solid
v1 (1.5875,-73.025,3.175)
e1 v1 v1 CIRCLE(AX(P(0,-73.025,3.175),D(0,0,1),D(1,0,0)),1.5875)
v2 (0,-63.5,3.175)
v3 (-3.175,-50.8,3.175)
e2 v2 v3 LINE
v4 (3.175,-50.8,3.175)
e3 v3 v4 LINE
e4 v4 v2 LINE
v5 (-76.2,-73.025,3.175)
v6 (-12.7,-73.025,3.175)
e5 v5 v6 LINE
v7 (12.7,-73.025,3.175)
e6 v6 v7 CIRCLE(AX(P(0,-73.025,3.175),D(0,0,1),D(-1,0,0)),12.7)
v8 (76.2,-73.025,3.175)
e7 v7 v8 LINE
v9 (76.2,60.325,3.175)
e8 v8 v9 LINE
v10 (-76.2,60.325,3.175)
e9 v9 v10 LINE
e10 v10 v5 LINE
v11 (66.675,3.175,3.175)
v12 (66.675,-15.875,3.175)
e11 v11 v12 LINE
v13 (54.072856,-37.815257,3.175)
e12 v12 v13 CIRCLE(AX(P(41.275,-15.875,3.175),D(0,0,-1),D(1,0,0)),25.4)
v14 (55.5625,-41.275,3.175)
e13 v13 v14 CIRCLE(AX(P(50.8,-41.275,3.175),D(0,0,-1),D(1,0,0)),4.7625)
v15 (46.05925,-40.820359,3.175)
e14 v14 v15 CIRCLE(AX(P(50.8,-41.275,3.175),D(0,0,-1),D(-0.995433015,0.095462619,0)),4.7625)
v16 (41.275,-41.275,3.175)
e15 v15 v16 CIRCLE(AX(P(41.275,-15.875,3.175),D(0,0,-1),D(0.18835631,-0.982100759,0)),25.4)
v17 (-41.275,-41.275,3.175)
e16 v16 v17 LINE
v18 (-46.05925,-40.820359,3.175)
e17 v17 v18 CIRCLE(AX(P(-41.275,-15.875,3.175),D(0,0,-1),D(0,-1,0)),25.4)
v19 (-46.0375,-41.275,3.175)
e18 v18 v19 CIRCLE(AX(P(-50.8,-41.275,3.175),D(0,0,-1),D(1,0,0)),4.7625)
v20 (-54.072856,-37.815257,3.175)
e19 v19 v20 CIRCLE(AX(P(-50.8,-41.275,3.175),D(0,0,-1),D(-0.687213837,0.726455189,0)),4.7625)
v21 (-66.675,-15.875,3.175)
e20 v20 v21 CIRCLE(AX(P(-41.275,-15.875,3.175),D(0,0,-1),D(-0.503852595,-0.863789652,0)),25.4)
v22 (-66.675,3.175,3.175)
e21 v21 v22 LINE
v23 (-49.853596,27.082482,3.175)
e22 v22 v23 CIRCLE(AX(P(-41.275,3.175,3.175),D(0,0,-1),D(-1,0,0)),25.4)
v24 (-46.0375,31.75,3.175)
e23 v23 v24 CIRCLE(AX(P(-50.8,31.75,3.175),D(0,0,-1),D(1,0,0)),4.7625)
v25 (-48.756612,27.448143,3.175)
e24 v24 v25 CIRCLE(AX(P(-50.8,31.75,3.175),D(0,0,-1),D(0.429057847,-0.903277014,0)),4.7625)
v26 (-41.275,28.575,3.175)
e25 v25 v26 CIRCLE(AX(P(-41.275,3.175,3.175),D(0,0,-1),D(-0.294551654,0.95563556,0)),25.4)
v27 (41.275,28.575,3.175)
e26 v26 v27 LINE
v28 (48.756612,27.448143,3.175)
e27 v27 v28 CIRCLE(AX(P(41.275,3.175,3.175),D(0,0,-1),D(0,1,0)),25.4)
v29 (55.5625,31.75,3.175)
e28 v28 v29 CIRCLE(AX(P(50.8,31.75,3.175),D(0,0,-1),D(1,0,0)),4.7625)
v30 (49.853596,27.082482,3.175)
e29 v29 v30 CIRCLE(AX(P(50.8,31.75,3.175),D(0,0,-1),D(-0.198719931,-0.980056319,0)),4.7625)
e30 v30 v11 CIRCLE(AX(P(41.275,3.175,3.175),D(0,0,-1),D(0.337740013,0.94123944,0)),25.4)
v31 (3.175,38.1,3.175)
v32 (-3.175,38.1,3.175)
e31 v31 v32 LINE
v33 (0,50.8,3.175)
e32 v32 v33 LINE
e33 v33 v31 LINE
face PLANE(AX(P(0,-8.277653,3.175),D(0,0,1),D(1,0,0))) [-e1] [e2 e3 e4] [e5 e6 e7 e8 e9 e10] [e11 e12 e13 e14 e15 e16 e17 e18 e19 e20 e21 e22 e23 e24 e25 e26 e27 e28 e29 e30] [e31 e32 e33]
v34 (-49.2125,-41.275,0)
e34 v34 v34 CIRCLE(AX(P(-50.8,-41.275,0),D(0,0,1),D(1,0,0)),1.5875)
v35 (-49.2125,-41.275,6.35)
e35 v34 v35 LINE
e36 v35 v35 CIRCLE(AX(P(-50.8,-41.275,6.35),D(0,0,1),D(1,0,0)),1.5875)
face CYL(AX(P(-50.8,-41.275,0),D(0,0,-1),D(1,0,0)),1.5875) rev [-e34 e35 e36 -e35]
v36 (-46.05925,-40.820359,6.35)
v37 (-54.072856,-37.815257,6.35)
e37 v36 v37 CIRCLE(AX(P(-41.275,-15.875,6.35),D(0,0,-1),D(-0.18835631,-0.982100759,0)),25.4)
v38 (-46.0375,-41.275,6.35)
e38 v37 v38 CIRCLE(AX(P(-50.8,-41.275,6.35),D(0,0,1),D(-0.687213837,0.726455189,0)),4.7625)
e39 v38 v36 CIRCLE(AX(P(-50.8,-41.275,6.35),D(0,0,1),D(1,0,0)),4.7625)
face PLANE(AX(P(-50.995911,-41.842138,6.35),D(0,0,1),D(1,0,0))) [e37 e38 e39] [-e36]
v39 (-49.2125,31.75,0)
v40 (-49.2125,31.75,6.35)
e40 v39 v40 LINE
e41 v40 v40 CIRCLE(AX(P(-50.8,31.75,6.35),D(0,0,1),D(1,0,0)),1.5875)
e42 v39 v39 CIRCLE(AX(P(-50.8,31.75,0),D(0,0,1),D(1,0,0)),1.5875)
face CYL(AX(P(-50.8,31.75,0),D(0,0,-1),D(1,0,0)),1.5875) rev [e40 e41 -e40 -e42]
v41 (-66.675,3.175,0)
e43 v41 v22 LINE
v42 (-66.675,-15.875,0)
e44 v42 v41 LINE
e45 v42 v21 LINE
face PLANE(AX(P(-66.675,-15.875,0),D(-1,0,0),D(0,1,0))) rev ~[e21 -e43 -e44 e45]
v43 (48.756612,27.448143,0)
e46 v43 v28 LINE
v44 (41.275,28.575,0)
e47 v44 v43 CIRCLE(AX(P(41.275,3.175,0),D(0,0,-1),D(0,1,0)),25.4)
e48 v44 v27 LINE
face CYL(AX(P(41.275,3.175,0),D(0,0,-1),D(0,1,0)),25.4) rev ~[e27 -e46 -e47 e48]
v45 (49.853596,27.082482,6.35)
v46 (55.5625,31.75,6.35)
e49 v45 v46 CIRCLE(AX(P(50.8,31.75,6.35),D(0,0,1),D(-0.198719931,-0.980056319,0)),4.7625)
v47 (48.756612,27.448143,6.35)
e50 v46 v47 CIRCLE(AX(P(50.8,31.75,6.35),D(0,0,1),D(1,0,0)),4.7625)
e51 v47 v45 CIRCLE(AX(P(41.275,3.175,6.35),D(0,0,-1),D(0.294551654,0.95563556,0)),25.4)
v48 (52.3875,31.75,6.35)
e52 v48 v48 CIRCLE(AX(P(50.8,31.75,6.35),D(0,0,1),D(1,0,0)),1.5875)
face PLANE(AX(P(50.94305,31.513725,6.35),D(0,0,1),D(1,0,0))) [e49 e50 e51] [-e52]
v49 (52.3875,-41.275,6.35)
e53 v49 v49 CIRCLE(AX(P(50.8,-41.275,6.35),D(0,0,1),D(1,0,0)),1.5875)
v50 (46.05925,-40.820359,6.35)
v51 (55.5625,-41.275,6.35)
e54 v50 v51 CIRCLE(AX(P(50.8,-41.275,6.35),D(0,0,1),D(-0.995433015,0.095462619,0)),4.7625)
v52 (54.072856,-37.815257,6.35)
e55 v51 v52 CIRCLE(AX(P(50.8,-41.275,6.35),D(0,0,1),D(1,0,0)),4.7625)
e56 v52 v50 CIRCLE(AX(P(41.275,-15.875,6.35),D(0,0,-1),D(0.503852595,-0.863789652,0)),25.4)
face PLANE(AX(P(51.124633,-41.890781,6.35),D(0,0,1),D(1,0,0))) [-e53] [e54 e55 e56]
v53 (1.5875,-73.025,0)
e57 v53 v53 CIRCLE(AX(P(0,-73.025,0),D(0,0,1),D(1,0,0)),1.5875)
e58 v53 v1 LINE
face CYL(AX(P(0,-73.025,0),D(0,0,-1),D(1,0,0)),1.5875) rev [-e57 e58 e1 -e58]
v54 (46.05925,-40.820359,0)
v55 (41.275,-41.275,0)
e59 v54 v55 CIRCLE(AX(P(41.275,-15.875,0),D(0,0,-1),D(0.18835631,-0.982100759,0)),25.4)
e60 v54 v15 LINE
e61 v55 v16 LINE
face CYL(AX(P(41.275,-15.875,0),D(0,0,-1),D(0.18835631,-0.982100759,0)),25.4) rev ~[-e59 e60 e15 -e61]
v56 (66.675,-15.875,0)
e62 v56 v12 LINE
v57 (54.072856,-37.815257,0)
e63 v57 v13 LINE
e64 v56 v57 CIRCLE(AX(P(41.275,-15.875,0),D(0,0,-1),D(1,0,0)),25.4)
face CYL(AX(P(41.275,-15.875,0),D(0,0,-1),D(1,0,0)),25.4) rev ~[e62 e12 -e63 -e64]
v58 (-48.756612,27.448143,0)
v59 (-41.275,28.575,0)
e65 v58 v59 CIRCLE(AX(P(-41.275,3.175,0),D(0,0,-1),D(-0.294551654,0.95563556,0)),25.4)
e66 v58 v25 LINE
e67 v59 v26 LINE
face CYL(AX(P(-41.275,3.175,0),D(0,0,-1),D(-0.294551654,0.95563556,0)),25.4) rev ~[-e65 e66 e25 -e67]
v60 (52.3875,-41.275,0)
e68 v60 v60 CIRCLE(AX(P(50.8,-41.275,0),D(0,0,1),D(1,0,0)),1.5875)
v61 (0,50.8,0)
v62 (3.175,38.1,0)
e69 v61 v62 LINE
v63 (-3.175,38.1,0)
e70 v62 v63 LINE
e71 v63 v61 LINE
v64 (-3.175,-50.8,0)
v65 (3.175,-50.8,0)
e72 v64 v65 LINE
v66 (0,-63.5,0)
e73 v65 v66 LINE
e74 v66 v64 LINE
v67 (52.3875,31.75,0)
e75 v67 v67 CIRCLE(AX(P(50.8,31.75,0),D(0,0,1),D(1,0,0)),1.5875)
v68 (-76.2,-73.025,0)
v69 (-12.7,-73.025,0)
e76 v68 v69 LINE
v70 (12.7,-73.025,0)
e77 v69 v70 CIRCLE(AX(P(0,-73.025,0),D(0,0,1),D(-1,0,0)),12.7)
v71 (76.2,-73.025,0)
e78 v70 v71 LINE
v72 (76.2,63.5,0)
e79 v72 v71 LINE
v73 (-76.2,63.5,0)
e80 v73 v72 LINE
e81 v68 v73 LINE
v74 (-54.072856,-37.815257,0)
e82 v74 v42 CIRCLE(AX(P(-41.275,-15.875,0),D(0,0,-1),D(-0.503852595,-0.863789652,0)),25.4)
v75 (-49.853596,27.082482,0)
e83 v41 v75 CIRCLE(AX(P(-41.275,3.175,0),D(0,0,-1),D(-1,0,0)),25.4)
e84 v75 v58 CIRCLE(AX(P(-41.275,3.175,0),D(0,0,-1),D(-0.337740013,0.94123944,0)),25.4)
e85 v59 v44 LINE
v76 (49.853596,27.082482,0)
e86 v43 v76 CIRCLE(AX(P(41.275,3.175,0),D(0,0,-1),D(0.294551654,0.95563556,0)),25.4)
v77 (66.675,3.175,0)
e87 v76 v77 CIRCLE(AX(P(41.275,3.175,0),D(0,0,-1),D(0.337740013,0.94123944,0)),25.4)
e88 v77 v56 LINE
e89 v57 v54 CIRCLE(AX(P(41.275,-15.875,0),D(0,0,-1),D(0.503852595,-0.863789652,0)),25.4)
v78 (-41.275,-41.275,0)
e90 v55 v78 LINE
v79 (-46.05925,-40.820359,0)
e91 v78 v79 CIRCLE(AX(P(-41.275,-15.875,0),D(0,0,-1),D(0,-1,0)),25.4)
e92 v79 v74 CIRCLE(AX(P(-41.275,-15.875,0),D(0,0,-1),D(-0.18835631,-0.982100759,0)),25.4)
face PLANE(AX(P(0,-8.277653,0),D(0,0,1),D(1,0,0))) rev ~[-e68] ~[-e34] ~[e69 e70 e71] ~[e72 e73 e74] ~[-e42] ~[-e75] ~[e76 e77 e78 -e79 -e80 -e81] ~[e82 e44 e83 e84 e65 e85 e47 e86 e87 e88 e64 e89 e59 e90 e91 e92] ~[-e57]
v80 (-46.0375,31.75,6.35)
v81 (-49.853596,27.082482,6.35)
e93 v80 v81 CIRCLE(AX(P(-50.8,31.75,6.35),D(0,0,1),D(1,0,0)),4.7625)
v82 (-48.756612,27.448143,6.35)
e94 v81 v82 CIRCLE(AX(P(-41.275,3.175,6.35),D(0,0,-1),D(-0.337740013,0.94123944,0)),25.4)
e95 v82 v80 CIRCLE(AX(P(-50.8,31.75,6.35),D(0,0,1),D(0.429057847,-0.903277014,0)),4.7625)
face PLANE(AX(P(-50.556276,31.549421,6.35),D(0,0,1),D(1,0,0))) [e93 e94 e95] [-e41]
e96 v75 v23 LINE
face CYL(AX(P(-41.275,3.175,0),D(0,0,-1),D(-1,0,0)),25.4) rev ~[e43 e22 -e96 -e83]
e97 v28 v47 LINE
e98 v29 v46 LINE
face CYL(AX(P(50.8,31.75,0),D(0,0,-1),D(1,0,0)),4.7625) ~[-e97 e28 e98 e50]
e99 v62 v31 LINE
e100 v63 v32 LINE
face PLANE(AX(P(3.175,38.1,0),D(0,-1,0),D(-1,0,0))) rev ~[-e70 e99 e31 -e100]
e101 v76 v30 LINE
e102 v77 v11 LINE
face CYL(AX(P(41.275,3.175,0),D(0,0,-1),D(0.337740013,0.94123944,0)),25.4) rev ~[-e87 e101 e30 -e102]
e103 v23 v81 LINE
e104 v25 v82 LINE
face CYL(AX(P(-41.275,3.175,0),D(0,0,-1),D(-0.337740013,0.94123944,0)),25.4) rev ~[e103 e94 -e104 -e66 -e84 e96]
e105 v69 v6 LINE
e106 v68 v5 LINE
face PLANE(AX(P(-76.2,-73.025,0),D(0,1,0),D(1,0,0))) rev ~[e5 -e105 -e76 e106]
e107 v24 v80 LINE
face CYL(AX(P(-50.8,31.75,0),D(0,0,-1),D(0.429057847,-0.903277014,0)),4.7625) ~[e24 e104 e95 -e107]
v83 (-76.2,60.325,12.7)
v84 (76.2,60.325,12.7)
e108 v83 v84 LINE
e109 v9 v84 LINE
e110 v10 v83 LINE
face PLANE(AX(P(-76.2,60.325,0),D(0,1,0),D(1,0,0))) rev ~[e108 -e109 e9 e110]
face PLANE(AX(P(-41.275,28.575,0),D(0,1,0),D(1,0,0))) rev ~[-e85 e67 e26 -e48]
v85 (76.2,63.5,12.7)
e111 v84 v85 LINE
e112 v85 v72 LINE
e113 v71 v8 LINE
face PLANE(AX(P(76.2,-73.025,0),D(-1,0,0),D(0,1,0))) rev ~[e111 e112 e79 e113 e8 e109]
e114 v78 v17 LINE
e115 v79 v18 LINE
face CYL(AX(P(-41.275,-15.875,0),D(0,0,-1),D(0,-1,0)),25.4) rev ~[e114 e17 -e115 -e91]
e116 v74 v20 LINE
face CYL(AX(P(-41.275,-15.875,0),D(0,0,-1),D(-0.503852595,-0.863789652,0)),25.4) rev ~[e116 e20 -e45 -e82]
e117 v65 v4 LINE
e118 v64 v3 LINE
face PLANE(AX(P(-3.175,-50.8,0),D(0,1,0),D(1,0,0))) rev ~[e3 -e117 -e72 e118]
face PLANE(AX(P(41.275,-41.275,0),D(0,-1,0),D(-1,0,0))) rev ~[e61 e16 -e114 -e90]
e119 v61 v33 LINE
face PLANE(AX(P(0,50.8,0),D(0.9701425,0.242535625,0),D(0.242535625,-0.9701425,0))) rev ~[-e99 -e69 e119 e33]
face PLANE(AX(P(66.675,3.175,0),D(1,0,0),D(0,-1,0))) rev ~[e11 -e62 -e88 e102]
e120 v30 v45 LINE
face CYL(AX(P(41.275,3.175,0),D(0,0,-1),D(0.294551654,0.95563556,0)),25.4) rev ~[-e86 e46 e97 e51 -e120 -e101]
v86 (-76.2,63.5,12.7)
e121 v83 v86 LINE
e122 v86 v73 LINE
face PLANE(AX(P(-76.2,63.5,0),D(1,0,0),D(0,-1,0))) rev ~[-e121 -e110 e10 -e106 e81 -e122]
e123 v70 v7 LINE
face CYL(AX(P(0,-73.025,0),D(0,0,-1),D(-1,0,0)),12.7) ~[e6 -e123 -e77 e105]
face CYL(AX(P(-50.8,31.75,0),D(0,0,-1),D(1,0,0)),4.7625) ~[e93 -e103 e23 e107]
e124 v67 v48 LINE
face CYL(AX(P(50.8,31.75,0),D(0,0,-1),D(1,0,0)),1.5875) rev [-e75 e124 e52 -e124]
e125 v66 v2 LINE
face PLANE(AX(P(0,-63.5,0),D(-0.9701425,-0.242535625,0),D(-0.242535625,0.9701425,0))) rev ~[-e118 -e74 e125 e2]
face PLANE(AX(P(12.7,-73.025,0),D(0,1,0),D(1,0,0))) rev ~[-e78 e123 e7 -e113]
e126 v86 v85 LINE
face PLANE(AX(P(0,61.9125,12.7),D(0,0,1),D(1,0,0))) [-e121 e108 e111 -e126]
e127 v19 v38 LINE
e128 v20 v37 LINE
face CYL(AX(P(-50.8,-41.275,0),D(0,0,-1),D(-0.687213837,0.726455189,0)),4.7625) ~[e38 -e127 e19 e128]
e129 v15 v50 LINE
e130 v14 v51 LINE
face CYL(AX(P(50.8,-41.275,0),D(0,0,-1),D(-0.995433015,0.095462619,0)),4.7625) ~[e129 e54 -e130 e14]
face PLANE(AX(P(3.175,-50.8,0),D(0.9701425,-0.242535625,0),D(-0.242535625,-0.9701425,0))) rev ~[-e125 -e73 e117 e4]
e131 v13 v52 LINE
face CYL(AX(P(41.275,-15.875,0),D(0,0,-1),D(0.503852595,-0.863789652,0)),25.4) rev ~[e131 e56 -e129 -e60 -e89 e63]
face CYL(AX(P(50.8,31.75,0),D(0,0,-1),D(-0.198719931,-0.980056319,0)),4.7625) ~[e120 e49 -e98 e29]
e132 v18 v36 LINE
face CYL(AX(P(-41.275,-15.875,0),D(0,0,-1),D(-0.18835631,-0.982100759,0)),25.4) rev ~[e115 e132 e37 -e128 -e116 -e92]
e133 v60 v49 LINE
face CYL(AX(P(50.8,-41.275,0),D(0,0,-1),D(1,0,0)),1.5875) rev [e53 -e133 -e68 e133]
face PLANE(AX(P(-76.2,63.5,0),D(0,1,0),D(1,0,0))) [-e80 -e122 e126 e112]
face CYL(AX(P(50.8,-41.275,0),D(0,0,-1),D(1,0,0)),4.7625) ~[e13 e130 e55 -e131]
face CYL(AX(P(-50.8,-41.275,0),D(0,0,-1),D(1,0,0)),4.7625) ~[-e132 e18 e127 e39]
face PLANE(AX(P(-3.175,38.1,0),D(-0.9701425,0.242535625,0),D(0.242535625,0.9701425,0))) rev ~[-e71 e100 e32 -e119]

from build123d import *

# Parameters (mm, degrees)
F0_R     = 1.5875
F0_W     = 152.4
F0_H     = 3.175
F1_DEPTH = 3.175
F2_DEPTH = 6.35
F3_DEPTH = 12.7


# Not quite as in the source:
# - a feature names something its author has since deleted; it is built from what else it names


with BuildPart() as f1:
    # F0 (on Top) → F1 (new body)
    with BuildSketch(Plane.XY):
        with BuildLine():
            Line((76.2, -63.5), (76.2, 60.325))
            Line((76.2, 60.325), (-76.2, 60.325))
            Line((-76.2, 60.325), (-76.2, -63.5))
            Line((-76.2, -63.5), (-76.2, -73.025))
            Line((-76.2, -73.025), (-12.7, -73.025))
            ThreePointArc((-12.7, -73.025), (0, -85.725), (12.7, -73.025))
            Line((12.7, -73.025), (76.2, -73.025))
            Line((76.2, -73.025), (76.2, -63.5))
        make_face()
        with Locations((0, -73.025)):
            Circle(F0_R, mode=Mode.SUBTRACT)
        Polygon((3.175, -50.8), (0, -63.5), (-3.175, -50.8), align=None, mode=Mode.SUBTRACT)
        with BuildLine():
            ThreePointArc((-49.8535963292, 27.0824817792), (-54.4870485305, 34.7644782938), (-46.0375, 31.75))
            ThreePointArc((-46.0375, 31.75), (-46.7742676703, 29.2054203766), (-48.7566120041, 27.4481432208))
            ThreePointArc((-48.7566120041, 27.4481432208), (-45.0579989552, 28.2917059724), (-41.275, 28.575))
            Line((-41.275, 28.575), (41.275, 28.575))
            ThreePointArc((41.275, 28.575), (45.0579989552, 28.2917059724), (48.7566120041, 27.4481432208))
            ThreePointArc((48.7566120041, 27.4481432208), (48.2554203766, 35.7757323297), (55.5625, 31.75))
            ThreePointArc((55.5625, 31.75), (53.8144782938, 28.0629514695), (49.8535963292, 27.0824817792))
            ThreePointArc((49.8535963292, 27.0824817792), (62.0482562055, 17.7911495141), (66.675, 3.175))
            Line((66.675, 3.175), (66.675, -15.875))
            ThreePointArc((66.675, -15.875), (63.3002757063, -28.525977435), (54.0728559007, -37.8152571622))
            ThreePointArc((54.0728559007, -37.8152571622), (55.1742646512, -39.3915948361), (55.5625, -41.275))
            ThreePointArc((55.5625, -41.275), (50.5724196506, -46.0320593264), (46.0592502637, -40.8203592761))
            ThreePointArc((46.0592502637, -40.8203592761), (43.6779018277, -41.1610843708), (41.275, -41.275))
            Line((41.275, -41.275), (-41.275, -41.275))
            ThreePointArc((-41.275, -41.275), (-43.6779018277, -41.1610843708), (-46.0592502637, -40.8203592761))
            ThreePointArc((-46.0592502637, -40.8203592761), (-46.0429406736, -41.0474196506), (-46.0375, -41.275))
            ThreePointArc((-46.0375, -41.275), (-52.6834051639, -45.6492646512), (-54.0728559007, -37.8152571622))
            ThreePointArc((-54.0728559007, -37.8152571622), (-63.3002757063, -28.525977435), (-66.675, -15.875))
            Line((-66.675, -15.875), (-66.675, 3.175))
            ThreePointArc((-66.675, 3.175), (-62.0482562055, 17.7911495141), (-49.8535963292, 27.0824817792))
        make_face(mode=Mode.SUBTRACT)
        Polygon((-3.175, 38.1), (0, 50.8), (3.175, 38.1), align=None, mode=Mode.SUBTRACT)
        with Locations((0, 61.9125)):
            Rectangle(F0_W, F0_H)
        with BuildLine():
            ThreePointArc((-48.7566120041, 27.4481432208), (-46.7742676703, 29.2054203766), (-46.0375, 31.75))
            ThreePointArc((-46.0375, 31.75), (-54.4870485305, 34.7644782938), (-49.8535963292, 27.0824817792))
            ThreePointArc((-49.8535963292, 27.0824817792), (-49.3071852568, 27.2715557705), (-48.7566120041, 27.4481432208))
        make_face()
        with Locations((-50.8, 31.75)):
            Circle(F0_R, mode=Mode.SUBTRACT)
        with BuildLine():
            ThreePointArc((55.5625, 31.75), (48.2554203766, 35.7757323297), (48.7566120041, 27.4481432208))
            ThreePointArc((48.7566120041, 27.4481432208), (49.3071852568, 27.2715557705), (49.8535963292, 27.0824817792))
            ThreePointArc((49.8535963292, 27.0824817792), (53.8144782938, 28.0629514695), (55.5625, 31.75))
        make_face()
        with Locations((50.8, 31.75)):
            Circle(F0_R, mode=Mode.SUBTRACT)
        with BuildLine():
            ThreePointArc((54.0728559007, -37.8152571622), (50.1935354163, -39.6577611103), (46.0592502637, -40.8203592761))
            ThreePointArc((46.0592502637, -40.8203592761), (50.5724196506, -46.0320593264), (55.5625, -41.275))
            ThreePointArc((55.5625, -41.275), (55.1742646512, -39.3915948361), (54.0728559007, -37.8152571622))
        make_face()
        with Locations((50.8, -41.275)):
            Circle(F0_R, mode=Mode.SUBTRACT)
        with BuildLine():
            ThreePointArc((-46.0592502637, -40.8203592761), (-50.1935354163, -39.6577611103), (-54.0728559007, -37.8152571622))
            ThreePointArc((-54.0728559007, -37.8152571622), (-52.6834051639, -45.6492646512), (-46.0375, -41.275))
            ThreePointArc((-46.0375, -41.275), (-46.0429406736, -41.0474196506), (-46.0592502637, -40.8203592761))
        make_face()
        with Locations((-50.8, -41.275)):
            Circle(F0_R, mode=Mode.SUBTRACT)
    extrude(amount=F1_DEPTH)

    # F0 (on Top) → F2 (join)
    with BuildSketch(Plane.XY):
        with BuildLine():
            ThreePointArc((-46.0592502637, -40.8203592761), (-50.1935354163, -39.6577611103), (-54.0728559007, -37.8152571622))
            ThreePointArc((-54.0728559007, -37.8152571622), (-52.6834051639, -45.6492646512), (-46.0375, -41.275))
            ThreePointArc((-46.0375, -41.275), (-46.0429406736, -41.0474196506), (-46.0592502637, -40.8203592761))
        make_face()
        with Locations((-50.8, -41.275)):
            Circle(F0_R, mode=Mode.SUBTRACT)
        with BuildLine():
            ThreePointArc((-48.7566120041, 27.4481432208), (-46.7742676703, 29.2054203766), (-46.0375, 31.75))
            ThreePointArc((-46.0375, 31.75), (-54.4870485305, 34.7644782938), (-49.8535963292, 27.0824817792))
            ThreePointArc((-49.8535963292, 27.0824817792), (-49.3071852568, 27.2715557705), (-48.7566120041, 27.4481432208))
        make_face()
        with Locations((-50.8, 31.75)):
            Circle(F0_R, mode=Mode.SUBTRACT)
        with BuildLine():
            ThreePointArc((54.0728559007, -37.8152571622), (50.1935354163, -39.6577611103), (46.0592502637, -40.8203592761))
            ThreePointArc((46.0592502637, -40.8203592761), (50.5724196506, -46.0320593264), (55.5625, -41.275))
            ThreePointArc((55.5625, -41.275), (55.1742646512, -39.3915948361), (54.0728559007, -37.8152571622))
        make_face()
        with Locations((50.8, -41.275)):
            Circle(F0_R, mode=Mode.SUBTRACT)
        with BuildLine():
            ThreePointArc((55.5625, 31.75), (48.2554203766, 35.7757323297), (48.7566120041, 27.4481432208))
            ThreePointArc((48.7566120041, 27.4481432208), (49.3071852568, 27.2715557705), (49.8535963292, 27.0824817792))
            ThreePointArc((49.8535963292, 27.0824817792), (53.8144782938, 28.0629514695), (55.5625, 31.75))
        make_face()
        with Locations((50.8, 31.75)):
            Circle(F0_R, mode=Mode.SUBTRACT)
    extrude(amount=F2_DEPTH)

    # F0 (on Top) → F3 (join)
    with BuildSketch(Plane.XY):
        with Locations((0, 61.9125)):
            Rectangle(F0_W, F0_H)
    extrude(amount=F3_DEPTH)


solid = f1.part
